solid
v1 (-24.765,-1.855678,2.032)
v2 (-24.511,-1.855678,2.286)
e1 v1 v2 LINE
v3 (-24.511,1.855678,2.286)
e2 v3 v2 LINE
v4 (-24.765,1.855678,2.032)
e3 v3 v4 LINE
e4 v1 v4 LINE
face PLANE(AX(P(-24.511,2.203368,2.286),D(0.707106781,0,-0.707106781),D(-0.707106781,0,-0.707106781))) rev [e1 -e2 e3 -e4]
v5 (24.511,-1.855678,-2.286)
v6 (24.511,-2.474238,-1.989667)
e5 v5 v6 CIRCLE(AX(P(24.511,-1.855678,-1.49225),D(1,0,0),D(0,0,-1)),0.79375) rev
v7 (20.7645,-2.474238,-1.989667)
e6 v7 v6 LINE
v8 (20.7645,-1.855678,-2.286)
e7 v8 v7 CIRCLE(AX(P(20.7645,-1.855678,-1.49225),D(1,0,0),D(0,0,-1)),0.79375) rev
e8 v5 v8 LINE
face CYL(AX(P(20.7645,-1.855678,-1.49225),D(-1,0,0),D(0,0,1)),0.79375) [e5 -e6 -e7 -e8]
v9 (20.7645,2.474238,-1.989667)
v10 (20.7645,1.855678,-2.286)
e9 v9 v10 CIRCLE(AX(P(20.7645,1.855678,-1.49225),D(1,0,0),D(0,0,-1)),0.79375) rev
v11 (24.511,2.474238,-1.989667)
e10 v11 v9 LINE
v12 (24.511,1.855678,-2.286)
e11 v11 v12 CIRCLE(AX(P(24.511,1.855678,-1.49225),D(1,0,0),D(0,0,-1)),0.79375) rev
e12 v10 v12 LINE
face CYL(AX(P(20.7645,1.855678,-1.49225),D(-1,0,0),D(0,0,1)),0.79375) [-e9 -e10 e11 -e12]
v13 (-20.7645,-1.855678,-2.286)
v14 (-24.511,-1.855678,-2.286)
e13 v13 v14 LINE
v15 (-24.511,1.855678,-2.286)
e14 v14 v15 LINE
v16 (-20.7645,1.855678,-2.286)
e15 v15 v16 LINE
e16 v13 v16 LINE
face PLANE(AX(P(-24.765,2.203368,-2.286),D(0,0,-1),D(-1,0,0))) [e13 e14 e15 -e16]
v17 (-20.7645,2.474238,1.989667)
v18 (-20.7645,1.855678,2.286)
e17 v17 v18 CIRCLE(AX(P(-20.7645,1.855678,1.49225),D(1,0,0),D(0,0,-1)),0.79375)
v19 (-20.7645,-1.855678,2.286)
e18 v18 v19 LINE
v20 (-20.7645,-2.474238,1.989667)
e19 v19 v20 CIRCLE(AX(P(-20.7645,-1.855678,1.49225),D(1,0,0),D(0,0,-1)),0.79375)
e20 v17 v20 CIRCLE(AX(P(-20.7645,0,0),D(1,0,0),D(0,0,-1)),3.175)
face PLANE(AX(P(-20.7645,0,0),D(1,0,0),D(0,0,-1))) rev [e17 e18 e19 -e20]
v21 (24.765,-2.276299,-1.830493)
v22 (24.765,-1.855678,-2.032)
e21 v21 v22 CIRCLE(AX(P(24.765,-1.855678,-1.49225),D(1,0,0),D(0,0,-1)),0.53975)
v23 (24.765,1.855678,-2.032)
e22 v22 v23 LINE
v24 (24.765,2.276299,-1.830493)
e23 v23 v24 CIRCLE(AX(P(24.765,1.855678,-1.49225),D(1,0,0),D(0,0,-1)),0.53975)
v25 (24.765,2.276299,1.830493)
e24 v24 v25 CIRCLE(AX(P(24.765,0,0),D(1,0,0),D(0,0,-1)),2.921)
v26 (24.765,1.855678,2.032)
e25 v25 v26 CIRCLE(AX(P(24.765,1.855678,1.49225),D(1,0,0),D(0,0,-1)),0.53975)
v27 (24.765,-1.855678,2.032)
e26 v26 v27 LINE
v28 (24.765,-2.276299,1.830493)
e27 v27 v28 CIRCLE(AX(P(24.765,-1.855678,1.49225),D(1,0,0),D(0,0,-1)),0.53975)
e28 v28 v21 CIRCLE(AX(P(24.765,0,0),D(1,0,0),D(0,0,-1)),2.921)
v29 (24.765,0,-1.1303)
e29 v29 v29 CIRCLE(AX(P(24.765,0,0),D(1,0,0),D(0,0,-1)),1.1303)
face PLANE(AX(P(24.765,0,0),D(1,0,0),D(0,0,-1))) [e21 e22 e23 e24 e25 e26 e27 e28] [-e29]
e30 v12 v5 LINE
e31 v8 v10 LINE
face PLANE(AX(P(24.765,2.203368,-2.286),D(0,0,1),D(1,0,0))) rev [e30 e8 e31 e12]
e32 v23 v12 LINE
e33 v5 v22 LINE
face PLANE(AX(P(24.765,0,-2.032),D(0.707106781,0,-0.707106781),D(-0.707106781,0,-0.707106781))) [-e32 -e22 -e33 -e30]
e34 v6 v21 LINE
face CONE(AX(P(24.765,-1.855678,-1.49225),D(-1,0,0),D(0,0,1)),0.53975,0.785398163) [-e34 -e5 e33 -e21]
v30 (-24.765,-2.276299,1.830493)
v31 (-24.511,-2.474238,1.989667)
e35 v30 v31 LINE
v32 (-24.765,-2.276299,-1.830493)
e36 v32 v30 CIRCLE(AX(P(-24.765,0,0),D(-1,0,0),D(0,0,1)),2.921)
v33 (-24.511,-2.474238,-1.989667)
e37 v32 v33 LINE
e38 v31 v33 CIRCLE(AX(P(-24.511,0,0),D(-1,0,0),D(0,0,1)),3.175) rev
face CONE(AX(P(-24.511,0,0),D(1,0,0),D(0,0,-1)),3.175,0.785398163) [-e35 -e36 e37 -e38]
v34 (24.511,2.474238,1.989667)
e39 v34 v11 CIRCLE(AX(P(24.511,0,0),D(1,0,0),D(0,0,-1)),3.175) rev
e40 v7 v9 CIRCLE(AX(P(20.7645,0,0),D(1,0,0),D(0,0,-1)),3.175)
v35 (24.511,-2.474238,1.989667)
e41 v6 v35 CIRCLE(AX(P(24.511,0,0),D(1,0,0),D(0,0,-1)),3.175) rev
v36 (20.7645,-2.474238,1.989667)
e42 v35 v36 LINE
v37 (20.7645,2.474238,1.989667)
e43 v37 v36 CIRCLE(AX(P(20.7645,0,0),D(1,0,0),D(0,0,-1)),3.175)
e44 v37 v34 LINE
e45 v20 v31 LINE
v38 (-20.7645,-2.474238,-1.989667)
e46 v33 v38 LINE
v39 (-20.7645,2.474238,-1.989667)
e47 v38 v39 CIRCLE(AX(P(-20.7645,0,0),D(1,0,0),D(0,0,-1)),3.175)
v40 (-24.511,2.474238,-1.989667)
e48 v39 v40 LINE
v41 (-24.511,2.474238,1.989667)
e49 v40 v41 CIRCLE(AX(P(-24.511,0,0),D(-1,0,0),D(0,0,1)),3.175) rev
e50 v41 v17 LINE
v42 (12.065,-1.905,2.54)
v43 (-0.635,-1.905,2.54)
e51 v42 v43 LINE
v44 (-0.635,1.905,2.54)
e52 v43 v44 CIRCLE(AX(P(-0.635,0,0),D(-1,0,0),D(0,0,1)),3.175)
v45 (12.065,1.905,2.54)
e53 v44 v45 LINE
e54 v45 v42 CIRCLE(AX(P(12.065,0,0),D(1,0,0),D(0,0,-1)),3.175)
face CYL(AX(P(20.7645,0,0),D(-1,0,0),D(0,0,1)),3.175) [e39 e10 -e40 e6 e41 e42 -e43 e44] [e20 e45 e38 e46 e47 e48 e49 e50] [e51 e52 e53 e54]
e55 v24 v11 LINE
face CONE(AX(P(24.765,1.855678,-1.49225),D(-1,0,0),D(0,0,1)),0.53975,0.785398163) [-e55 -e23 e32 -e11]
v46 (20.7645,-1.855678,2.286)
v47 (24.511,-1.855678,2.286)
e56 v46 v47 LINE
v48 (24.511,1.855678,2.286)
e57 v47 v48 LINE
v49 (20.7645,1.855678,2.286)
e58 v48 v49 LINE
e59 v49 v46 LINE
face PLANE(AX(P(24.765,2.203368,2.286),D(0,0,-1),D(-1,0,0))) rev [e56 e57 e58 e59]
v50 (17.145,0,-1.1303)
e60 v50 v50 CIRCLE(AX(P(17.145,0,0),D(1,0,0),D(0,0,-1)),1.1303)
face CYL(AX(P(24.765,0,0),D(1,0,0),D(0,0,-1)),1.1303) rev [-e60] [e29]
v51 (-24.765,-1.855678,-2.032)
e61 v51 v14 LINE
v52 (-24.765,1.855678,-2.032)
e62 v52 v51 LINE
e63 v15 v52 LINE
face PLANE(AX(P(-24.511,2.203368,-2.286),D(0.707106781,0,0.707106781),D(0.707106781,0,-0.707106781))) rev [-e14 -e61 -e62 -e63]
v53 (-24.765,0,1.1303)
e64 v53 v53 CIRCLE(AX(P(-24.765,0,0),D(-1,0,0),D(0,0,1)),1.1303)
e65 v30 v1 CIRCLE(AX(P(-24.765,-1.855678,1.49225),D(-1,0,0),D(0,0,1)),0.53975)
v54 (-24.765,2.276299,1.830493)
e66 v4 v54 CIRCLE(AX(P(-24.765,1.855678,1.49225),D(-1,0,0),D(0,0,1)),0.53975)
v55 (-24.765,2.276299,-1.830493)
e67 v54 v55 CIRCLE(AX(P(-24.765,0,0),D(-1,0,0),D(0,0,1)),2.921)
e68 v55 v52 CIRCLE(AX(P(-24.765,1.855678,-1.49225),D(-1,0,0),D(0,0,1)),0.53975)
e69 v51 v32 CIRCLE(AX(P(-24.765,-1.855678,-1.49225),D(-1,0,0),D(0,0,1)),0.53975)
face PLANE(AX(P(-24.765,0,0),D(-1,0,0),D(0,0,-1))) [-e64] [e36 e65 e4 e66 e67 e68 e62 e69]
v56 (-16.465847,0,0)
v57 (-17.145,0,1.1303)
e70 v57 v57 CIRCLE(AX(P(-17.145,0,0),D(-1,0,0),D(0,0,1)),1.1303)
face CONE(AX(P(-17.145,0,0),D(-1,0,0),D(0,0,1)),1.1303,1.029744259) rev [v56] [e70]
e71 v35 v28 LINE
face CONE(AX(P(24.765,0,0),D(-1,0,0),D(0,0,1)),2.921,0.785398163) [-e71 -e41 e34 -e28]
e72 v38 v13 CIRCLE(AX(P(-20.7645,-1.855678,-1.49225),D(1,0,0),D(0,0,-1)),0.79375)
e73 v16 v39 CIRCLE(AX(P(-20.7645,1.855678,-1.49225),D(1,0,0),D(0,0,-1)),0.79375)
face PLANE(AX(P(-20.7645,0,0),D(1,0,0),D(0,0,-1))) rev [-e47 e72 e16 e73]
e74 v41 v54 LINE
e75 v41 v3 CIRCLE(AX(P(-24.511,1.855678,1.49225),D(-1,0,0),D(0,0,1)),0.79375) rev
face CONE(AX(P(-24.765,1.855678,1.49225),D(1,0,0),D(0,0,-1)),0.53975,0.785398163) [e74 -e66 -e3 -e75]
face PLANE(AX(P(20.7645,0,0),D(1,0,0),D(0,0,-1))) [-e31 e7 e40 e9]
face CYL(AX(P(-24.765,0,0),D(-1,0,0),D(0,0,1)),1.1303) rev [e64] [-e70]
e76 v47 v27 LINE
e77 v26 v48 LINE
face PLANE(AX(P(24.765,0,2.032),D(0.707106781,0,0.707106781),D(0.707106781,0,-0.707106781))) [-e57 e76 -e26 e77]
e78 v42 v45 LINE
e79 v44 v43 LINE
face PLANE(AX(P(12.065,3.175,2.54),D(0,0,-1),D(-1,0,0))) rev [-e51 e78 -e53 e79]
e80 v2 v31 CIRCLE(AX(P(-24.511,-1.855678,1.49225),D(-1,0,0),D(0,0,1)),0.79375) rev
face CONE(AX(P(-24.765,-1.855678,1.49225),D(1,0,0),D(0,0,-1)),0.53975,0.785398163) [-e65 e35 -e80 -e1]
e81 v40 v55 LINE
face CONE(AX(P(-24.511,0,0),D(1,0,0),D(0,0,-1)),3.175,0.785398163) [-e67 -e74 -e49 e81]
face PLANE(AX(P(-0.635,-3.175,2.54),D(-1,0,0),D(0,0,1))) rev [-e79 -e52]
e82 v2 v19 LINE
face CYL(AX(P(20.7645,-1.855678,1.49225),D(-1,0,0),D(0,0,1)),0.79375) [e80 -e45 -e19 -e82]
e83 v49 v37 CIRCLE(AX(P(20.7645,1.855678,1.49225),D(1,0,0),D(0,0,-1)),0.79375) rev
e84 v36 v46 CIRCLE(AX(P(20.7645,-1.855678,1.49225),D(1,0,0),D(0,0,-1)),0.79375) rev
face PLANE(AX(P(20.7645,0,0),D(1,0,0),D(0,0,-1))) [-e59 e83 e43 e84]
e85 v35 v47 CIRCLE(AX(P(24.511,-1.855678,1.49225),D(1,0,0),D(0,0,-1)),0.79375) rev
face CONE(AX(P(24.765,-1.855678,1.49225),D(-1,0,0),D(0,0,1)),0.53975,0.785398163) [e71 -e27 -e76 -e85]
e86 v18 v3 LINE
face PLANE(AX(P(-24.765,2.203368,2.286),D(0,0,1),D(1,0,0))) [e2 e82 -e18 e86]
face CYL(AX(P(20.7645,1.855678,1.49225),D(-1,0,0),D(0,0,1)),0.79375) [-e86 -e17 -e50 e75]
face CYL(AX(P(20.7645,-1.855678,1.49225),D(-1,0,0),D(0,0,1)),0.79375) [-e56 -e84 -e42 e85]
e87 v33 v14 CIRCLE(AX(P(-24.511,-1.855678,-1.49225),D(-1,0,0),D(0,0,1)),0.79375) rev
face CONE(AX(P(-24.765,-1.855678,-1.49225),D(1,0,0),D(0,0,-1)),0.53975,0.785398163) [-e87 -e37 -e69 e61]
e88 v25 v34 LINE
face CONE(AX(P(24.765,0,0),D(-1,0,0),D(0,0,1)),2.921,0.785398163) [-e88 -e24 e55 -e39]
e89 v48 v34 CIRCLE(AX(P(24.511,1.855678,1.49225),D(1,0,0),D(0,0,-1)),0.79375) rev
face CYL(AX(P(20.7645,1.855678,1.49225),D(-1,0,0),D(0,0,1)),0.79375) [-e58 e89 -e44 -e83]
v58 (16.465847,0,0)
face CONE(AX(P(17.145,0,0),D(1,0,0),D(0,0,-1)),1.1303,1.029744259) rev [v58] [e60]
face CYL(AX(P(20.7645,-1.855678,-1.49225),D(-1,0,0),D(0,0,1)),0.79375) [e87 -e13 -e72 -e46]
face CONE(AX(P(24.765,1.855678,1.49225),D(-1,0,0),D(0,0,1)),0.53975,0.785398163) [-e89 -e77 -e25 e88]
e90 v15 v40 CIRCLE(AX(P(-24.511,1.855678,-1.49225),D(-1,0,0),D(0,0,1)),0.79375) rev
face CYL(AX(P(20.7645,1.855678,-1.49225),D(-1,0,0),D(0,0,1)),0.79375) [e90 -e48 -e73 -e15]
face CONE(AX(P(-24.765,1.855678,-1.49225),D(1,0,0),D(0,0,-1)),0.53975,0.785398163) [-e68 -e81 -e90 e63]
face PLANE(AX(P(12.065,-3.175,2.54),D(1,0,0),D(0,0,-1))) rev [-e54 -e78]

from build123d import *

# Parameters (mm, degrees)
SKETCH1_R                = 3.175
BOSS_EXTRUDE1_DEPTH      = 20.7645
BOSS_EXTRUDE2_START      = 4.0005
BOSS_EXTRUDE2_DEPTH      = 4.0005
FILLET1_R                = 0.79375
CHAMFER1_SIZE            = 0.254
FILLET1_OF_MIRROR2_R     = 0.79375
CHAMFER1_OF_MIRROR2_SIZE = 0.254
SKETCH5_W                = 12.7
SKETCH5_H                = 6.35
CUT_EXTRUDE1_DEPTH       = 0.635


with BuildPart() as part:
    # Sketch1 → Boss-Extrude1 (new, symmetric)
    with BuildSketch(Plane(origin=(0, 0, 0), x_dir=(0, 0, -1), z_dir=(1, 0, 0))):
        Circle(SKETCH1_R)
    extrude(amount=BOSS_EXTRUDE1_DEPTH, both=True)

    # Sketch2 → Boss-Extrude2 (add)
    with BuildSketch(Plane(origin=(20.7645, 0, 0), x_dir=(0, 0, -1), z_dir=(1, 0, 0)).offset(BOSS_EXTRUDE2_START)):
        with BuildLine():
            Line((-2.286, 2.20336765), (-2.286, -2.20336765))
            ThreePointArc((-2.286, -2.20336765), (0, -3.175), (2.286, -2.20336765))
            Line((2.286, -2.20336765), (2.286, 2.20336765))
            ThreePointArc((2.286, 2.20336765), (0, 3.175), (-2.286, 2.20336765))
        make_face()
    boss_extrude2 = extrude(amount=-BOSS_EXTRUDE2_DEPTH)

    # Fillet1
    # the kernel refuses this fillet: 0.79375 mm, written as the material it takes off along each edge
    with BuildSketch(Plane(origin=(25.768693051, 2.20336765, -2.286), x_dir=(0, 0.6746831627986616, 0.7381074649642793), z_dir=(-1, 0, 0)), Plane(origin=(25.768693051, -2.20336765, 2.286), x_dir=(0, -0.6746831627986605, -0.7381074649642803), z_dir=(-1, 0, 0))) as fillet1_piece_1:
        with BuildLine():
            CenterArc((0.351292568, -0.792161955), FILLET1_R, 86.375070371, 51.195378821)
            Line((-0.234580233, -0.256632195), (0, 0))
            ThreePointArc((0, 0), (0.20073861, 0.006352179), (0.40147722, 0))
        make_face()
    extrude(amount=5.004193051, mode=Mode.SUBTRACT)
    with BuildSketch(Plane(origin=(25.768693051, -2.20336765, -2.286), x_dir=(0, -0.6746831627986618, 0.738107464964279), z_dir=(-1, 0, 0)), Plane(origin=(25.768693051, 2.20336765, 2.286), x_dir=(0, 0.6746831627986606, -0.73810746496428), z_dir=(-1, 0, 0))) as fillet1_piece_2:
        with BuildLine():
            CenterArc((0.351292568, 0.792161955), FILLET1_R, 222.429550808, 51.195378821)
            Line((-0.234580233, 0.256632195), (0, 0))
            ThreePointArc((0, 0), (0.20073861, -0.006352179), (0.40147722, 0))
        make_face()
    extrude(amount=5.004193051, mode=Mode.SUBTRACT)

    # Sketch3 → #4-40 Tapped Hole1 (revolve, cut)
    with BuildSketch(Plane(origin=(24.765, 0, 0), x_dir=(0, 0, -1), z_dir=(0, 1, 0))):
        Polygon((0, 0), (0, 8.299152758), (1.1303, 7.62), (1.1303, 0), align=None)
    f_4_40_tapped_hole1 = revolve(axis=Axis((31.115, 0, 0), (-1, 0, 0)), mode=Mode.SUBTRACT)

    # Chamfer1
    chamfer1_edges = [part.edges().sort_by_distance(p)[0] for p in [
        (24.765, 0, -2.286),
        (24.765, 3.175, 0),
        (24.765, -3.175, 0),
        (24.765, 0, 2.286),
        (24.765, 2.198617373, 2.208093398),
        (24.765, -2.198617373, 2.208093398),
        (24.765, 2.198617373, -2.208093398),
        (24.765, -2.198617373, -2.208093398),
    ]]
    chamfer(chamfer1_edges, length=CHAMFER1_SIZE)

    # Mirror2: Boss-Extrude2, #4-40 Tapped Hole1 across plane
    add(boss_extrude2.mirror(Plane(origin=(0, 0, 0), x_dir=(0, 0, 1), z_dir=(1, 0, 0))))
    add(f_4_40_tapped_hole1.mirror(Plane(origin=(0, 0, 0), x_dir=(0, 0, 1), z_dir=(1, 0, 0))), mode=Mode.SUBTRACT)

    # Fillet1 of Mirror2
    # the kernel refuses this fillet: 0.79375 mm, written as the material it takes off along each edge
    with BuildSketch(Plane(origin=(-25.768693051, 2.20336765, -2.286), x_dir=(0, 0.6746831627986613, 0.7381074649642795), z_dir=(1, 0, 0)), Plane(origin=(-25.768693051, -2.20336765, 2.286), x_dir=(0, -0.67468316279866, -0.7381074649642806), z_dir=(1, 0, 0))) as fillet1_of_mirror2_piece_1:
        with BuildLine():
            CenterArc((0.351292568, 0.792161955), FILLET1_OF_MIRROR2_R, 222.429550808, 51.195378821)
            Line((-0.234580233, 0.256632195), (0, 0))
            ThreePointArc((0, 0), (0.20073861, -0.006352179), (0.40147722, 0))
        make_face()
    extrude(amount=5.004193051, mode=Mode.SUBTRACT)
    with BuildSketch(Plane(origin=(-25.768693051, -2.20336765, -2.286), x_dir=(0, -0.6746831627986595, 0.738107464964281), z_dir=(1, 0, 0)), Plane(origin=(-25.768693051, 2.20336765, 2.286), x_dir=(0, 0.674683162798661, -0.7381074649642797), z_dir=(1, 0, 0))) as fillet1_of_mirror2_piece_2:
        with BuildLine():
            CenterArc((0.351292568, -0.792161955), FILLET1_OF_MIRROR2_R, 86.375070371, 51.195378821)
            Line((-0.234580233, -0.256632195), (0, 0))
            ThreePointArc((0, 0), (0.20073861, 0.006352179), (0.40147722, 0))
        make_face()
    extrude(amount=5.004193051, mode=Mode.SUBTRACT)

    # Chamfer1 of Mirror2
    chamfer1_of_mirror2_edges = [part.edges().sort_by_distance(p)[0] for p in [
        (-24.765, 0, -2.286),
        (-24.765, 3.175, 0),
        (-24.765, -3.175, 0),
        (-24.765, 0, 2.286),
        (-24.765, 2.198617373, 2.208093398),
        (-24.765, -2.198617373, 2.208093398),
        (-24.765, 2.198617373, -2.208093398),
        (-24.765, -2.198617373, -2.208093398),
    ]]
    chamfer(chamfer1_of_mirror2_edges, length=CHAMFER1_OF_MIRROR2_SIZE)

    # Sketch5 → Cut-Extrude1 (cut)
    with BuildSketch(Plane.XY.offset(3.175)):
        with Locations((5.715, 0)):
            Rectangle(SKETCH5_W, SKETCH5_H)
    extrude(amount=-CUT_EXTRUDE1_DEPTH, mode=Mode.SUBTRACT)


solid = part.part
